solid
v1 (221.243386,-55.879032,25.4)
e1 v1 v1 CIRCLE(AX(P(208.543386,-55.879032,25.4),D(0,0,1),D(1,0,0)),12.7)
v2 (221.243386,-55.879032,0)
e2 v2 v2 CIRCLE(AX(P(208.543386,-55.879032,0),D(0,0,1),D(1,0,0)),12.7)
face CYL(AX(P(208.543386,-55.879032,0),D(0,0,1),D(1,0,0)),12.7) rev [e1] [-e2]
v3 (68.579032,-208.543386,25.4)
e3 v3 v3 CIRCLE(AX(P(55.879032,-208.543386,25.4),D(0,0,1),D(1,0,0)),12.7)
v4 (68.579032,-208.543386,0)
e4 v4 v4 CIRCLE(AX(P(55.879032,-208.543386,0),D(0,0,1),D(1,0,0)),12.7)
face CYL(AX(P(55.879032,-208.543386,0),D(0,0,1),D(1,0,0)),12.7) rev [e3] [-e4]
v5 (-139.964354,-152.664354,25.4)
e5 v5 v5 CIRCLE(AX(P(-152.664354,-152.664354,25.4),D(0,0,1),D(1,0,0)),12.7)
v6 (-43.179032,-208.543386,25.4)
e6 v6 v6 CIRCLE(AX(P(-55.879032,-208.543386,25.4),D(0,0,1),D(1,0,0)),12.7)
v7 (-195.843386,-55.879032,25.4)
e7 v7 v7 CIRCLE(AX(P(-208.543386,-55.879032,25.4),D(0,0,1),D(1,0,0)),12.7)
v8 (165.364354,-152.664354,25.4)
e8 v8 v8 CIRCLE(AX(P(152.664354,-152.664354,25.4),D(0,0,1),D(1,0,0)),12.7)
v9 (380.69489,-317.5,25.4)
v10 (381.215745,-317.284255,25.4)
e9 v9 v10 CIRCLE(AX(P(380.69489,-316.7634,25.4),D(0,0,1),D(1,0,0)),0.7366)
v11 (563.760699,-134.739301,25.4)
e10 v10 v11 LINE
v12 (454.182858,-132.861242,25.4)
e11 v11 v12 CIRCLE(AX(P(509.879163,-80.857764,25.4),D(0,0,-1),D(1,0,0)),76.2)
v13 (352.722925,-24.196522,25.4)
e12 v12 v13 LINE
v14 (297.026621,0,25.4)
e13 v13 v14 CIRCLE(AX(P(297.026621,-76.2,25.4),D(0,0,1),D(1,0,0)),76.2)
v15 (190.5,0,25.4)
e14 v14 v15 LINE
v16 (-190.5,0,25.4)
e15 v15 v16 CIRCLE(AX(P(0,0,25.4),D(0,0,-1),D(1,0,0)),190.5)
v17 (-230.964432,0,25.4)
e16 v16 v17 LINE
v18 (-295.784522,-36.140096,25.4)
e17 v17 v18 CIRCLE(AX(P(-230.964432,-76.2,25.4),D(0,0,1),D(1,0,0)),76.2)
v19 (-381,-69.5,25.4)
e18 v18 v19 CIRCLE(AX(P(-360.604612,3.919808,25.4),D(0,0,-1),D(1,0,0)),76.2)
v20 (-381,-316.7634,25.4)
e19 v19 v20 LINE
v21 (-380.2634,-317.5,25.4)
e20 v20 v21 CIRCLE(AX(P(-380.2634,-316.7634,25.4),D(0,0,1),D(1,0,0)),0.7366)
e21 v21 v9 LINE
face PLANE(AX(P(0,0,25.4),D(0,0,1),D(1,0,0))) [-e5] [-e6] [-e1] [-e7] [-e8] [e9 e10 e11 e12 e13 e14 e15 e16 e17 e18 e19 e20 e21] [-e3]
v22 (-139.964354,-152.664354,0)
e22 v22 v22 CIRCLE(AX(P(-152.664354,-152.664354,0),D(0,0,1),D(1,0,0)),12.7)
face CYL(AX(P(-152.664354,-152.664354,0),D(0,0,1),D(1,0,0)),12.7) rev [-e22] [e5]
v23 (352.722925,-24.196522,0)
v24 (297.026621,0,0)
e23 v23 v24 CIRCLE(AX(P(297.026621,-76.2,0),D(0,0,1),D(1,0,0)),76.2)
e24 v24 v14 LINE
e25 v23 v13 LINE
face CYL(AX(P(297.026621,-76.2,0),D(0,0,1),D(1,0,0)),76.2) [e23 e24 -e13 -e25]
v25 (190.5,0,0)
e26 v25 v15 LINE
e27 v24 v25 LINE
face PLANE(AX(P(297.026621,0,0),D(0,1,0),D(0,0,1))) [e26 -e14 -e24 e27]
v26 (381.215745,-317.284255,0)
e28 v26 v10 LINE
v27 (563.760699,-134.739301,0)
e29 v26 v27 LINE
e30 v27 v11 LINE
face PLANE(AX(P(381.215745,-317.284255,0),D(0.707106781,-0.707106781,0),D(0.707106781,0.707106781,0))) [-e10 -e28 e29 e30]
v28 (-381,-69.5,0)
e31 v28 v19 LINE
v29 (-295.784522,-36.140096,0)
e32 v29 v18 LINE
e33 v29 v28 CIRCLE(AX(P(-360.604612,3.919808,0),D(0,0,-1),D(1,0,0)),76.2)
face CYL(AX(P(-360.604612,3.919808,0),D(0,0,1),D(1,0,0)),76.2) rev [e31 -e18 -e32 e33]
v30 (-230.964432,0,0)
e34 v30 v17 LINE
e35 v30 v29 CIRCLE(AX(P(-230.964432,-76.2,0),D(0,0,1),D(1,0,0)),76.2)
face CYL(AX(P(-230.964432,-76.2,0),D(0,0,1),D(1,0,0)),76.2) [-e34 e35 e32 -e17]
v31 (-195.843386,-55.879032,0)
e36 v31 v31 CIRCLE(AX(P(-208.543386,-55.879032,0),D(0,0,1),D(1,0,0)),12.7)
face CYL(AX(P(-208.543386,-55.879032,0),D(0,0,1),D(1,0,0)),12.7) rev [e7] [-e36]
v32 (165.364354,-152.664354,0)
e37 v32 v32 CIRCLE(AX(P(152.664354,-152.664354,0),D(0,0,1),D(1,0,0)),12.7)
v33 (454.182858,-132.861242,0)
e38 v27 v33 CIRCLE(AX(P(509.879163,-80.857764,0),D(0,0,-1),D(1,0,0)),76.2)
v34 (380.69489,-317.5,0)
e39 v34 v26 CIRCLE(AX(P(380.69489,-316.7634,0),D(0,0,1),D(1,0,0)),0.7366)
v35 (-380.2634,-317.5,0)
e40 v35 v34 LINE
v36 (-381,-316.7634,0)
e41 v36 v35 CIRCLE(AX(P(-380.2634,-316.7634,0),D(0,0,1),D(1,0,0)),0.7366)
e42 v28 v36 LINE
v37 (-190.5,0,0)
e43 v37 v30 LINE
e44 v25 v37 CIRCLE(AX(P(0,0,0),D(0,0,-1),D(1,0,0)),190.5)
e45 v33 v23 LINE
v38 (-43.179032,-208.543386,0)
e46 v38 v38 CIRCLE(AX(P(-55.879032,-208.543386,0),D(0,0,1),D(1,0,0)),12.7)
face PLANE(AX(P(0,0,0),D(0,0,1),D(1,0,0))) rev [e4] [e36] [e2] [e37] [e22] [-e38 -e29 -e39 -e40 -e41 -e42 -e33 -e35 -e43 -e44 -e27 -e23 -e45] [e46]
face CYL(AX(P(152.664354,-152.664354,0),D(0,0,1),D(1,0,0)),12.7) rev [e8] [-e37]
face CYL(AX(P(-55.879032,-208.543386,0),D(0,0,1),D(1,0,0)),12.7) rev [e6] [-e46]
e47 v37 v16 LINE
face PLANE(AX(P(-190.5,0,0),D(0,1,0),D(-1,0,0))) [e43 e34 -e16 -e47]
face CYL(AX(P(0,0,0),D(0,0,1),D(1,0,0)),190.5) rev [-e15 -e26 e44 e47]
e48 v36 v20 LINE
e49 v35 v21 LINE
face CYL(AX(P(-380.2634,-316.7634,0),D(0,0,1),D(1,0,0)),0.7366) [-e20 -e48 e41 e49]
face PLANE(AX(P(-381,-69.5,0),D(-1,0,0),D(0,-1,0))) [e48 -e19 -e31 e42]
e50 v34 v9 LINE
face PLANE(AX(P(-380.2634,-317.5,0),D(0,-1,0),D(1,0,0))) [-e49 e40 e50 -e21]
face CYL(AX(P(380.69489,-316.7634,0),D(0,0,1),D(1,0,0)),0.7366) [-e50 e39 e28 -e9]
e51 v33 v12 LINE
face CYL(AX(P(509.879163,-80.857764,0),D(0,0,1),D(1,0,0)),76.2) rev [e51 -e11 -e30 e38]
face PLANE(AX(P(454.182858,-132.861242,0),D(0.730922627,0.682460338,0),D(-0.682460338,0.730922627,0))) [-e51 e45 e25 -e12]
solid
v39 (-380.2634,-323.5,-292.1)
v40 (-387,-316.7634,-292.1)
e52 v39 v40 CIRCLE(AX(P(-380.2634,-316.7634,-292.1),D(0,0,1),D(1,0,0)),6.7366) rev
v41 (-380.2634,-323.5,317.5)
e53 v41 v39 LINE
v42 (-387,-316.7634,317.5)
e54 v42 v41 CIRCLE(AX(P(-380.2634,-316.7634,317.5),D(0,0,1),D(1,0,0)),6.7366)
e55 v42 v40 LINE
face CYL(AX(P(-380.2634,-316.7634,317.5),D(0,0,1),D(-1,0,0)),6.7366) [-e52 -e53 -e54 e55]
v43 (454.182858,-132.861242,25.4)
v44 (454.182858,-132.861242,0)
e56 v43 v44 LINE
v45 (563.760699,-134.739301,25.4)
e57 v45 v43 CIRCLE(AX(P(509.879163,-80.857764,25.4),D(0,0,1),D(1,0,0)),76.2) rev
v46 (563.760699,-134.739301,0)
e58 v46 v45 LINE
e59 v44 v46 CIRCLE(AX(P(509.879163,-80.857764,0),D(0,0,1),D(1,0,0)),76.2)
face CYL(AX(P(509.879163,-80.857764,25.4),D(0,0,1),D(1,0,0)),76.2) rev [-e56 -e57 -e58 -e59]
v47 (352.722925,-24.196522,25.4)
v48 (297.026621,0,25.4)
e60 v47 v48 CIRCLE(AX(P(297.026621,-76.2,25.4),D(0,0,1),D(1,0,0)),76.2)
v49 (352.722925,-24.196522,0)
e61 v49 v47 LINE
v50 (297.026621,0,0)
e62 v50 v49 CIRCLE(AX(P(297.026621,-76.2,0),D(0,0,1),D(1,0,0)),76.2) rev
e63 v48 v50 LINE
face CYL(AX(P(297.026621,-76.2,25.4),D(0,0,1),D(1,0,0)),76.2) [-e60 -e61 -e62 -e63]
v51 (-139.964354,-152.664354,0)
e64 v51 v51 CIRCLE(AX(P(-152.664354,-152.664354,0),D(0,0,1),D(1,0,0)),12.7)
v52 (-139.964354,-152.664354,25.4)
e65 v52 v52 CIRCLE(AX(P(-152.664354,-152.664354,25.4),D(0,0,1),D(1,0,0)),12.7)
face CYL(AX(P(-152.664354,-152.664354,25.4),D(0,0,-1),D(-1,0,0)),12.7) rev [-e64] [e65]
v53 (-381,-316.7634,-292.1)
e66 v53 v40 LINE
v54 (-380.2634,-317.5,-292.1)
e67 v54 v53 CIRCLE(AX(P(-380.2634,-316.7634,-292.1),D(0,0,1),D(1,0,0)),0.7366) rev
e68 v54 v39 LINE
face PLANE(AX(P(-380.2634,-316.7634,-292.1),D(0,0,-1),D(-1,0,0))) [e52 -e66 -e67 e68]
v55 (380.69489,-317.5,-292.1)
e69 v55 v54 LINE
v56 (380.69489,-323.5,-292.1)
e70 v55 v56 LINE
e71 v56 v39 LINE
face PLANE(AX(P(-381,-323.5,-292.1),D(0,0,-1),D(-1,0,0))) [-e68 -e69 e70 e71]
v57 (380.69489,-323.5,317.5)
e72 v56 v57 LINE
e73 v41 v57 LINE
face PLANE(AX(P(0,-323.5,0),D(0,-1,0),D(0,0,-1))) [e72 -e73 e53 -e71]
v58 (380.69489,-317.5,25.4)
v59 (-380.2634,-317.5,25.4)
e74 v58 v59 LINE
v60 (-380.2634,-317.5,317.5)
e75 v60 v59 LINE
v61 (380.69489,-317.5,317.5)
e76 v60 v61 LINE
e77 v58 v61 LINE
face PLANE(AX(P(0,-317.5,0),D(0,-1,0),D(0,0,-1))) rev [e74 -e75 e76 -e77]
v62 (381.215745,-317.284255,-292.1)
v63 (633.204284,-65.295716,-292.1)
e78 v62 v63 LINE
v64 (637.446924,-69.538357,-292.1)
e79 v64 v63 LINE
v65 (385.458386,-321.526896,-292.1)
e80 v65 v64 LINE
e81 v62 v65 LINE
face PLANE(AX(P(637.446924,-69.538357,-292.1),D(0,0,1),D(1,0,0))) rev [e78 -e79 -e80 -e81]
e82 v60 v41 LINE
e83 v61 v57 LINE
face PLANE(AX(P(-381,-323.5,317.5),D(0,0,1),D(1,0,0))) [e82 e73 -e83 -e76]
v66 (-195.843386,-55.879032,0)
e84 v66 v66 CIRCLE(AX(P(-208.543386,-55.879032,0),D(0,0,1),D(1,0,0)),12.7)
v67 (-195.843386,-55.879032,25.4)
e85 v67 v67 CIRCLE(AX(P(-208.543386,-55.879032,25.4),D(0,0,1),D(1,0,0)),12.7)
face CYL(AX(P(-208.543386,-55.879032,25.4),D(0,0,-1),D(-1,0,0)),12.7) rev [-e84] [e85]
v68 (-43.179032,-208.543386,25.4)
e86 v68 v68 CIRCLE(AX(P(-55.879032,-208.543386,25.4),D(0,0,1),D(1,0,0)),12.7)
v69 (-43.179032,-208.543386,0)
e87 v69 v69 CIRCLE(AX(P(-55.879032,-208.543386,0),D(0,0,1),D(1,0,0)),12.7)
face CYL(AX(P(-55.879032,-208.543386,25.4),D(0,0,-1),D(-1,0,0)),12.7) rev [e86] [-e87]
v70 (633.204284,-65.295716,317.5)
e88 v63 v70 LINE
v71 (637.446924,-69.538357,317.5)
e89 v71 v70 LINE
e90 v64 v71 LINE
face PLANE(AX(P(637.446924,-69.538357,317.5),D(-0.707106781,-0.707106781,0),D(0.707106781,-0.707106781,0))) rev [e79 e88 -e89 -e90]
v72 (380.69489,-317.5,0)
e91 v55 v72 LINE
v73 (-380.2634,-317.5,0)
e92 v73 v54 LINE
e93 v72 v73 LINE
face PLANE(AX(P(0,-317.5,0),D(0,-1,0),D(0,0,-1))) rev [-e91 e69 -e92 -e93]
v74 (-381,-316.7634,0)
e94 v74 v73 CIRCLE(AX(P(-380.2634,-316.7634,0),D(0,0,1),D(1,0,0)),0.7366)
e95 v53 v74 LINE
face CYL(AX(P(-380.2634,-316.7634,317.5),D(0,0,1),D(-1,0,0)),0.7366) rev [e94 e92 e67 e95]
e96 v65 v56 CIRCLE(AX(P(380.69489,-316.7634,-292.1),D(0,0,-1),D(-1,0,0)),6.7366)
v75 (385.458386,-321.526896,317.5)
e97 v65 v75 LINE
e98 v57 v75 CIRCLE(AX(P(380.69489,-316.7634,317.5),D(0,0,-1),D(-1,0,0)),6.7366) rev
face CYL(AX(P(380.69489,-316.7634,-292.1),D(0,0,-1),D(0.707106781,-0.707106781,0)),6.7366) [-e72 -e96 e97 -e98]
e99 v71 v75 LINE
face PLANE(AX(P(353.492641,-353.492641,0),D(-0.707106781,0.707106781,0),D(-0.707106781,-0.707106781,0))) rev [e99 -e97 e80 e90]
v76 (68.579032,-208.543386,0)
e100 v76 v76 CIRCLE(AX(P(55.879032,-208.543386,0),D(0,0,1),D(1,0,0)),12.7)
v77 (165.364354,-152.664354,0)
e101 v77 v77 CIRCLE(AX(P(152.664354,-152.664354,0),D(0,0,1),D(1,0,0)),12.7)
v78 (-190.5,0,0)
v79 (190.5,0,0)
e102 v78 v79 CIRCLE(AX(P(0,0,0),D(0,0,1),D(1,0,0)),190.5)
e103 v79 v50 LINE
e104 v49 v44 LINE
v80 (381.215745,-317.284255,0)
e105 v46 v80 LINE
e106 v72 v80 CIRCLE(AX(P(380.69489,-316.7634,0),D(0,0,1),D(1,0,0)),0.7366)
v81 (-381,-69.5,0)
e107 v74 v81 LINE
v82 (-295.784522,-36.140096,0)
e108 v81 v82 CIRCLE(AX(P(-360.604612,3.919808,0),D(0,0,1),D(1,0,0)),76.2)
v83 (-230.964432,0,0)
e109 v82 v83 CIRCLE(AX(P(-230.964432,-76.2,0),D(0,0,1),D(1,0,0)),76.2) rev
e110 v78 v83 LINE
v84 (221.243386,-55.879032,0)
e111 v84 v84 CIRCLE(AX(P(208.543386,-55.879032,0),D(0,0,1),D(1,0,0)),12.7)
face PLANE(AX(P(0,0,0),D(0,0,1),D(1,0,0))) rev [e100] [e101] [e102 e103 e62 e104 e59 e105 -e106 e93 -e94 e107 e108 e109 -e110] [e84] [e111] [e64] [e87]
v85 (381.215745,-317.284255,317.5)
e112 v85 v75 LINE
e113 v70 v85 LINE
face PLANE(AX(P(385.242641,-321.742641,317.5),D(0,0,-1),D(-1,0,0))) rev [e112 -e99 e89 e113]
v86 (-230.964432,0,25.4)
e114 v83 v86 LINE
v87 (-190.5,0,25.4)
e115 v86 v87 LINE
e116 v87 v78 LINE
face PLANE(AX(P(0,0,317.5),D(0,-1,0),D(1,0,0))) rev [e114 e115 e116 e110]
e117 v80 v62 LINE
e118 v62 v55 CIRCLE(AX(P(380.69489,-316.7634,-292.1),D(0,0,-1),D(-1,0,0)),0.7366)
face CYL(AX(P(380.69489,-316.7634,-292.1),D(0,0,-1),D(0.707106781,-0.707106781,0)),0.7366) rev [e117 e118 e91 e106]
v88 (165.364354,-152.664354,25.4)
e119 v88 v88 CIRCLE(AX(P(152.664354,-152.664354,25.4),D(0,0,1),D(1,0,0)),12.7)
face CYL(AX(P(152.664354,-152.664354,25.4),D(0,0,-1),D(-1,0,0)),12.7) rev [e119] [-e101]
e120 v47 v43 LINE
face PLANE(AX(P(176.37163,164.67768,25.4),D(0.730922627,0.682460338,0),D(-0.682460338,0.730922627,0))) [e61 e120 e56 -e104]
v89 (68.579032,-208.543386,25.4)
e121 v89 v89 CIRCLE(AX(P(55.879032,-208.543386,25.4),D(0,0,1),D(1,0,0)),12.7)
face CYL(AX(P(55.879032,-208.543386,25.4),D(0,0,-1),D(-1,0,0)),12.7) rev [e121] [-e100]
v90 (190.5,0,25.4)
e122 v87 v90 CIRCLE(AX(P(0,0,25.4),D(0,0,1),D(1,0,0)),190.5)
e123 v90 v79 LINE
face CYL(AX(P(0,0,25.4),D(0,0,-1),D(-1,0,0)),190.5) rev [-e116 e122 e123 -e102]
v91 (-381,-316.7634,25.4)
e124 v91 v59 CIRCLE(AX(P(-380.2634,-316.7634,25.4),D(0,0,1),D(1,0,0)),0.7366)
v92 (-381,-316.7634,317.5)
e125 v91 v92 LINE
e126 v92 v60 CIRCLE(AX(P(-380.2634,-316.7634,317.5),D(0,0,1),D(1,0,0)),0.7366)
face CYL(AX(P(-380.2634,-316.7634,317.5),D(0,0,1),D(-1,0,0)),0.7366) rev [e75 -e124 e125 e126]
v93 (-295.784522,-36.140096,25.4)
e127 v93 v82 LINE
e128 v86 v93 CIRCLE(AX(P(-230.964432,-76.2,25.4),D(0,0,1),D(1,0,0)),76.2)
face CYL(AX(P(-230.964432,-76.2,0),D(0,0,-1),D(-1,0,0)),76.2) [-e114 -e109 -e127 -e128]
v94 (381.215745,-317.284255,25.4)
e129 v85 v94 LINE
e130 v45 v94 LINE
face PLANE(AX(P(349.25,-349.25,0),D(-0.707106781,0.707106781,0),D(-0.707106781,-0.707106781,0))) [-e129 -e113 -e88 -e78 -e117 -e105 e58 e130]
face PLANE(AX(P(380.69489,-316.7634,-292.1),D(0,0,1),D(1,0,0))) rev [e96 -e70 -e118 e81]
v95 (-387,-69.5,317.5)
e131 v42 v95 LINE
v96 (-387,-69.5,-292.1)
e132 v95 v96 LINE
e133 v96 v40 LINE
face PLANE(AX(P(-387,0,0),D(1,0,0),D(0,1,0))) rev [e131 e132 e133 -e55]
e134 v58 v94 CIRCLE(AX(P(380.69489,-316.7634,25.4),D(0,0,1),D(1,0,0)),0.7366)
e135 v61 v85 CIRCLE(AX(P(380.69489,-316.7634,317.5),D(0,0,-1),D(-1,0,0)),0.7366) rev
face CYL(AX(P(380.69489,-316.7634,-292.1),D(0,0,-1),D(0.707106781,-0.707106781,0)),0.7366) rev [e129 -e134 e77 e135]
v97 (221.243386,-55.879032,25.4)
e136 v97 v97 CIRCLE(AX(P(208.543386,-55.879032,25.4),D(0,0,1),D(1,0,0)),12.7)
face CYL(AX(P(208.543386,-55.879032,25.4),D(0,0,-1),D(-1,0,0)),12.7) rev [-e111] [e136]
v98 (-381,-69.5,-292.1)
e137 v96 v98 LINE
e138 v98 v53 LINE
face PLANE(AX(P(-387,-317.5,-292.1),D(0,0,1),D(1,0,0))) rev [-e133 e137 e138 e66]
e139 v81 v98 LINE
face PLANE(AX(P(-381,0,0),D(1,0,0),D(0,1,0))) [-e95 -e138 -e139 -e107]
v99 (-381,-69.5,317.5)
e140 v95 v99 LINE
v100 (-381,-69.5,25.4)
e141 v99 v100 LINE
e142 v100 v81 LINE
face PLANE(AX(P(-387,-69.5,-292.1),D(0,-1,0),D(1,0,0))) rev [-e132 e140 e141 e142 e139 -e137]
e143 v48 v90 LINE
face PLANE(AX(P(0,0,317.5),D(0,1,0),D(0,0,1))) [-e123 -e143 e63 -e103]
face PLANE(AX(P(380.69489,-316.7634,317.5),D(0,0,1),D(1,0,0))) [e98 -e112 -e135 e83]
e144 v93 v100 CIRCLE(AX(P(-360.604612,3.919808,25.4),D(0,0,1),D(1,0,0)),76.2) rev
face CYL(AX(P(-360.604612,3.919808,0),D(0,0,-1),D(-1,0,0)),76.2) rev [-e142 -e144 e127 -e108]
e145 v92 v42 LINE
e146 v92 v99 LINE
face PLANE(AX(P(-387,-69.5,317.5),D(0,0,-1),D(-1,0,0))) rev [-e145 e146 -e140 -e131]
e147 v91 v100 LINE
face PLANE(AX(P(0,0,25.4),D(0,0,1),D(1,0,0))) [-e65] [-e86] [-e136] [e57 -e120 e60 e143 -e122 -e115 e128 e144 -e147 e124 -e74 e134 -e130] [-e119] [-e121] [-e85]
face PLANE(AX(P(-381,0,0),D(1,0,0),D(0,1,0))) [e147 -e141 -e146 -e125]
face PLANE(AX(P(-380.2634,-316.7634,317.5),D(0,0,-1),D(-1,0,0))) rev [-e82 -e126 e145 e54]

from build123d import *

# Parameters (mm, degrees)
SKETCH1_R                    = 241.3
SKETCH1_R_2                  = 190.5
SKETCH1_R_3                  = 12.7
BOSS_EXTRUDE1_DEPTH          = 25.4
SKETCH19_W                   = 762
SKETCH19_H                   = 609.6
BASE_FLANGE1_DEPTH           = 6
EDGE_FLANGE1_STRIP_CUT_DEPTH = 609.6
EDGE_FLANGE1_DEPTH           = 609.6
EDGE_FLANGE2_STRIP_W         = 25.4732
EDGE_FLANGE2_STRIP_H         = 6
EDGE_FLANGE2_STRIP_CUT_DEPTH = 609.6
EDGE_FLANGE2_DEPTH           = 609.6
BOSS_EXTRUDE2_DEPTH          = 12.7
BOSS_EXTRUDE2_DEPTH_BACK     = 12.7
FILLET1_R                    = 76.2
SKETCH30_R                   = 12.7
CUT_EXTRUDE1_DEPTH           = 783.174585068
FILLET3_R                    = 76.2
SKETCH31_R                   = 12.7
BOSS_EXTRUDE3_DEPTH          = 25.4


# Sheet-metal steps are written as plain solids
with BuildPart() as part:
    # Sketch1 → Boss-Extrude1 (new body)
    with BuildSketch(Plane.XY):
        Circle(SKETCH1_R)
        Circle(SKETCH1_R_2, mode=Mode.SUBTRACT)
        with Locations((55.879031838, 208.543385896)):
            Circle(SKETCH1_R_3, mode=Mode.SUBTRACT)
        with Locations((152.664354058, 152.664354058)):
            Circle(SKETCH1_R_3, mode=Mode.SUBTRACT)
        with Locations((208.543385896, 55.879031838)):
            Circle(SKETCH1_R_3, mode=Mode.SUBTRACT)
        with Locations((208.543385896, -55.879031838)):
            Circle(SKETCH1_R_3, mode=Mode.SUBTRACT)
        with Locations((152.664354058, -152.664354058)):
            Circle(SKETCH1_R_3, mode=Mode.SUBTRACT)
        with Locations((55.879031838, -208.543385896)):
            Circle(SKETCH1_R_3, mode=Mode.SUBTRACT)
        with Locations((-55.879031838, -208.543385896)):
            Circle(SKETCH1_R_3, mode=Mode.SUBTRACT)
        with Locations((-152.664354058, -152.664354058)):
            Circle(SKETCH1_R_3, mode=Mode.SUBTRACT)
        with Locations((-208.543385896, -55.879031838)):
            Circle(SKETCH1_R_3, mode=Mode.SUBTRACT)
        with Locations((-208.543385896, 55.879031838)):
            Circle(SKETCH1_R_3, mode=Mode.SUBTRACT)
        with Locations((-152.664354058, 152.664354058)):
            Circle(SKETCH1_R_3, mode=Mode.SUBTRACT)
        with Locations((-55.879031838, 208.543385896)):
            Circle(SKETCH1_R_3, mode=Mode.SUBTRACT)
    extrude(amount=BOSS_EXTRUDE1_DEPTH)



with BuildPart() as body_2:
    # Sketch19 → Base-Flange1 (new body)
    with BuildSketch(Plane(origin=(0, -317.5, 0), x_dir=(1, 0, 0), z_dir=(0, 1, 0))):
        with Locations((0, -12.7)):
            Rectangle(SKETCH19_W, SKETCH19_H)
    extrude(amount=-BASE_FLANGE1_DEPTH)

    # Edge-Flange1 strip (across the edge) → Edge-Flange1 strip cut (cut)
    with BuildSketch(Plane(origin=(381, -317.5, 317.5), x_dir=(-0.7071067811865438, 0.7071067811865512, 0), z_dir=(0, 0, -1))):
        Polygon((-22.039168001, 13.553886626), (-4.026895542, -4.458385832), (0.215745145, -0.215745145), (-17.796527314, 17.796527314), align=None)
    extrude(amount=EDGE_FLANGE1_STRIP_CUT_DEPTH, mode=Mode.SUBTRACT)

    # Edge-Flange1 section (across the edge) → Edge-Flange1 (add)
    with BuildSketch(Plane(origin=(381, -317.5, 317.5), x_dir=(-0.7071067811865438, 0.7071067811865512, 0), z_dir=(0, 0, -1))):
        with BuildLine():
            Line((-6, 0.30510971), (-6, 356.670718626))
            Line((-6, 356.670718626), (0, 356.670718626))
            Line((0, 356.670718626), (0, 0.30510971))
            ThreePointArc((0, 0.30510971), (0.056070336, 0.023225094), (0.215745145, -0.215745145))
            Line((0.215745145, -0.215745145), (-4.026895542, -4.458385832))
            ThreePointArc((-4.026895542, -4.458385832), (-5.487206859, -2.2728755), (-6, 0.30510971))
        make_face()
    extrude(amount=EDGE_FLANGE1_DEPTH)

    # Edge-Flange2 strip (across the edge) → Edge-Flange2 strip cut (cut)
    with BuildSketch(Plane(origin=(-381, -317.5, -292.1), x_dir=(1, 0, 0), z_dir=(0, 0, 1))):
        with Locations((-12, -3)):
            Rectangle(EDGE_FLANGE2_STRIP_W, EDGE_FLANGE2_STRIP_H)
    extrude(amount=EDGE_FLANGE2_STRIP_CUT_DEPTH, mode=Mode.SUBTRACT)

    # Edge-Flange2 section (across the edge) → Edge-Flange2 (add)
    with BuildSketch(Plane(origin=(-381, -317.5, -292.1), x_dir=(1, 0, 0), z_dir=(0, 0, 1))):
        with BuildLine():
            Line((-6, 0.7366), (-6, 248))
            Line((-6, 248), (0, 248))
            Line((0, 248), (0, 0.7366))
            ThreePointArc((0, 0.7366), (0.215745145, 0.215745145), (0.7366, 0))
            Line((0.7366, 0), (0.7366, -6))
            ThreePointArc((0.7366, -6), (-4.026895542, -4.026895542), (-6, 0.7366))
        make_face()
    extrude(amount=EDGE_FLANGE2_DEPTH)


with BuildPart() as part_1:
    add(part.part)

    add(body_2.part)  # Boss-Extrude2 merges body 2
    # Sketch2 → Boss-Extrude2 (add, two sides: drawn at the far end of the back side and taken through both)
    with BuildSketch(Plane(origin=(0, 0, 12.7), x_dir=(-1, 0, 0), z_dir=(0, 0, -1)).offset(-BOSS_EXTRUDE2_DEPTH_BACK)):
        with BuildLine():
            Line((-176.371629871, 164.677679655), (-508, -190.5))
            Line((-508, -190.5), (-381, -317.5))
            Line((-381, -317.5), (381, -317.5))
            Line((381, -317.5), (381, -190.5))
            Line((381, -190.5), (211.187529283, 116.728391899))
            ThreePointArc((211.187529283, 116.728391899), (-29.628031694, -239.474152547), (-176.371629871, 164.677679655))
        make_face()
    extrude(amount=BOSS_EXTRUDE2_DEPTH + BOSS_EXTRUDE2_DEPTH_BACK)

    # Fillet1
    # the kernel refuses this fillet: 76.2 mm, written as the material it adds along each edge
    with BuildSketch(Plane(origin=(-381, -190.5, 0), x_dir=(0, 1, 0), z_dir=(0, 0, 1))) as fillet1_piece_1:
        with BuildLine():
            CenterArc((194.419807723, -20.395387566), FILLET1_R, 164.475167034, 76.594355804)
            Line((157.558210281, -87.086186287), (156.820978332, -88.420002261))
            Line((156.820978332, -88.420002261), (-0.737231949, -1.333815974))
            Line((-0.737231949, -1.333815974), (0, 1.524))
            ThreePointArc((0, 1.524), (60.5, 1.524), (119.531603846, 0.407907751))
            Line((119.531603846, 0.407907751), (121, 0))
        make_face()
    extrude(amount=25.4)
    with BuildSketch(Plane(origin=(508, -190.5, 25.4), x_dir=(0.7071067811865509, 0.707106781186544, 0), z_dir=(0, 0, -1))) as fillet1_piece_2:
        with BuildLine():
            CenterArc((FILLET1_R * 1.03487581695, -FILLET1_R), FILLET1_R, 90, 91.963796982)
            Line((FILLET1_R * 0.0354631377737, -FILLET1_R * 1.03426801283), (FILLET1_R * 0.0154748841901, -FILLET1_R * 1.03495337309))
            Line((FILLET1_R * 0.0154748841901, -FILLET1_R * 1.03495337309), (-FILLET1_R * 0.020697516339, FILLET1_R * 0.02))
            Line((-FILLET1_R * 0.020697516339, FILLET1_R * 0.02), (FILLET1_R * 1.03487581695, FILLET1_R * 0.02))
            Line((FILLET1_R * 1.03487581695, FILLET1_R * 0.02), (FILLET1_R * 1.03487581695, 0))
        make_face()
    extrude(amount=25.4)

    # Sketch30 → Cut-Extrude1 (cut, through all)
    # profile 1 of 3: a face of its own
    with BuildSketch(Plane(origin=(0, 0, 0), x_dir=(-1, 0, 0), z_dir=(0, 0, -1))):
        with BuildLine():
            Line((-330.130702101, 0), (-241.3, 0))
            ThreePointArc((-241.3, 0), (-224.481808047, 88.507671171), (-176.371629871, 164.677679655))
            Line((-176.371629871, 164.677679655), (-330.130702101, 0))
        make_face()
    # profile 2 of 3: a face of its own
    with BuildSketch(Plane(origin=(0, 0, 0), x_dir=(-1, 0, 0), z_dir=(0, 0, -1))):
        with BuildLine():
            Line((-241.3, 0), (-190.5, 0))
            ThreePointArc((-190.5, 0), (0, 190.5), (190.5, 0))
            Line((190.5, 0), (241.3, 0))
            ThreePointArc((241.3, 0), (233.650637508, 60.274949954), (211.187529283, 116.728391899))
            ThreePointArc((211.187529283, 116.728391899), (29.628031694, 239.474152547), (-176.371629871, 164.677679655))
            ThreePointArc((-176.371629871, 164.677679655), (-224.481808047, 88.507671171), (-241.3, 0))
        make_face()
        with Locations((-208.543385896, 55.879031838)):
            Circle(SKETCH30_R, mode=Mode.SUBTRACT)
        with Locations((-152.664354058, 152.664354058)):
            Circle(SKETCH30_R, mode=Mode.SUBTRACT)
        with Locations((-55.879031838, 208.543385896)):
            Circle(SKETCH30_R, mode=Mode.SUBTRACT)
        with Locations((208.543385896, 55.879031838)):
            Circle(SKETCH30_R, mode=Mode.SUBTRACT)
        with Locations((55.879031838, 208.543385896)):
            Circle(SKETCH30_R, mode=Mode.SUBTRACT)
        with Locations((152.664354058, 152.664354058)):
            Circle(SKETCH30_R, mode=Mode.SUBTRACT)
    # profile 3 of 3: a face of its own
    with BuildSketch(Plane(origin=(0, 0, 0), x_dir=(-1, 0, 0), z_dir=(0, 0, -1))):
        with BuildLine():
            ThreePointArc((211.187529283, 116.728391899), (233.650637508, 60.274949954), (241.3, 0))
            Line((241.3, 0), (275.706099682, 0))
            Line((275.706099682, 0), (211.187529283, 116.728391899))
        make_face()
    extrude(amount=-CUT_EXTRUDE1_DEPTH, mode=Mode.SUBTRACT)

    # Fillet3
    fillet3_edges = [part_1.edges().sort_by_distance(p)[0] for p in [
        (-275.706099682, 0, 12.7),
        (330.130702101, 0, 12.7),
    ]]
    fillet(fillet3_edges, radius=FILLET3_R)


with BuildPart() as body_2_2:
    # Sketch31 → Boss-Extrude3 (new body)
    with BuildSketch(Plane.XY.offset(25.4)):
        with BuildLine():
            Line((-190.5, 0), (-230.964431894, 0))
            ThreePointArc((-230.964431894, 0), (-268.071542572, -9.645493488), (-295.784522164, -36.140096139))
            ThreePointArc((-295.784522164, -36.140096139), (-332.826755263, -67.036732857), (-381, -69.5))
            Line((-381, -69.5), (-381, -316.7634))
            ThreePointArc((-381, -316.7634), (-380.784254855, -317.284254855), (-380.2634, -317.5))
            Line((-380.2634, -317.5), (380.69489029, -317.5))
            ThreePointArc((380.69489029, -317.5), (380.976774906, -317.443929664), (381.215745145, -317.284254855))
            Line((381.215745145, -317.284254855), (563.760699338, -134.739300662))
            ThreePointArc((563.760699338, -134.739300662), (508.573359578, -157.046574652), (454.182858442, -132.861241721))
            Line((454.182858442, -132.861241721), (352.722924767, -24.196522214))
            ThreePointArc((352.722924767, -24.196522214), (327.389220887, -6.31042636), (297.026620597, 0))
            Line((297.026620597, 0), (190.5, 0))
            ThreePointArc((190.5, 0), (0, -190.5), (-190.5, 0))
        make_face()
        with Locations((208.543385896, -55.879031838)):
            Circle(SKETCH31_R, mode=Mode.SUBTRACT)
        with Locations((152.664354058, -152.664354058)):
            Circle(SKETCH31_R, mode=Mode.SUBTRACT)
        with Locations((55.879031838, -208.543385896)):
            Circle(SKETCH31_R, mode=Mode.SUBTRACT)
        with Locations((-55.879031838, -208.543385896)):
            Circle(SKETCH31_R, mode=Mode.SUBTRACT)
        with Locations((-152.664354058, -152.664354058)):
            Circle(SKETCH31_R, mode=Mode.SUBTRACT)
        with Locations((-208.543385896, -55.879031838)):
            Circle(SKETCH31_R, mode=Mode.SUBTRACT)
    extrude(amount=-BOSS_EXTRUDE3_DEPTH)


solid = Compound([part_1.part, body_2_2.part])
